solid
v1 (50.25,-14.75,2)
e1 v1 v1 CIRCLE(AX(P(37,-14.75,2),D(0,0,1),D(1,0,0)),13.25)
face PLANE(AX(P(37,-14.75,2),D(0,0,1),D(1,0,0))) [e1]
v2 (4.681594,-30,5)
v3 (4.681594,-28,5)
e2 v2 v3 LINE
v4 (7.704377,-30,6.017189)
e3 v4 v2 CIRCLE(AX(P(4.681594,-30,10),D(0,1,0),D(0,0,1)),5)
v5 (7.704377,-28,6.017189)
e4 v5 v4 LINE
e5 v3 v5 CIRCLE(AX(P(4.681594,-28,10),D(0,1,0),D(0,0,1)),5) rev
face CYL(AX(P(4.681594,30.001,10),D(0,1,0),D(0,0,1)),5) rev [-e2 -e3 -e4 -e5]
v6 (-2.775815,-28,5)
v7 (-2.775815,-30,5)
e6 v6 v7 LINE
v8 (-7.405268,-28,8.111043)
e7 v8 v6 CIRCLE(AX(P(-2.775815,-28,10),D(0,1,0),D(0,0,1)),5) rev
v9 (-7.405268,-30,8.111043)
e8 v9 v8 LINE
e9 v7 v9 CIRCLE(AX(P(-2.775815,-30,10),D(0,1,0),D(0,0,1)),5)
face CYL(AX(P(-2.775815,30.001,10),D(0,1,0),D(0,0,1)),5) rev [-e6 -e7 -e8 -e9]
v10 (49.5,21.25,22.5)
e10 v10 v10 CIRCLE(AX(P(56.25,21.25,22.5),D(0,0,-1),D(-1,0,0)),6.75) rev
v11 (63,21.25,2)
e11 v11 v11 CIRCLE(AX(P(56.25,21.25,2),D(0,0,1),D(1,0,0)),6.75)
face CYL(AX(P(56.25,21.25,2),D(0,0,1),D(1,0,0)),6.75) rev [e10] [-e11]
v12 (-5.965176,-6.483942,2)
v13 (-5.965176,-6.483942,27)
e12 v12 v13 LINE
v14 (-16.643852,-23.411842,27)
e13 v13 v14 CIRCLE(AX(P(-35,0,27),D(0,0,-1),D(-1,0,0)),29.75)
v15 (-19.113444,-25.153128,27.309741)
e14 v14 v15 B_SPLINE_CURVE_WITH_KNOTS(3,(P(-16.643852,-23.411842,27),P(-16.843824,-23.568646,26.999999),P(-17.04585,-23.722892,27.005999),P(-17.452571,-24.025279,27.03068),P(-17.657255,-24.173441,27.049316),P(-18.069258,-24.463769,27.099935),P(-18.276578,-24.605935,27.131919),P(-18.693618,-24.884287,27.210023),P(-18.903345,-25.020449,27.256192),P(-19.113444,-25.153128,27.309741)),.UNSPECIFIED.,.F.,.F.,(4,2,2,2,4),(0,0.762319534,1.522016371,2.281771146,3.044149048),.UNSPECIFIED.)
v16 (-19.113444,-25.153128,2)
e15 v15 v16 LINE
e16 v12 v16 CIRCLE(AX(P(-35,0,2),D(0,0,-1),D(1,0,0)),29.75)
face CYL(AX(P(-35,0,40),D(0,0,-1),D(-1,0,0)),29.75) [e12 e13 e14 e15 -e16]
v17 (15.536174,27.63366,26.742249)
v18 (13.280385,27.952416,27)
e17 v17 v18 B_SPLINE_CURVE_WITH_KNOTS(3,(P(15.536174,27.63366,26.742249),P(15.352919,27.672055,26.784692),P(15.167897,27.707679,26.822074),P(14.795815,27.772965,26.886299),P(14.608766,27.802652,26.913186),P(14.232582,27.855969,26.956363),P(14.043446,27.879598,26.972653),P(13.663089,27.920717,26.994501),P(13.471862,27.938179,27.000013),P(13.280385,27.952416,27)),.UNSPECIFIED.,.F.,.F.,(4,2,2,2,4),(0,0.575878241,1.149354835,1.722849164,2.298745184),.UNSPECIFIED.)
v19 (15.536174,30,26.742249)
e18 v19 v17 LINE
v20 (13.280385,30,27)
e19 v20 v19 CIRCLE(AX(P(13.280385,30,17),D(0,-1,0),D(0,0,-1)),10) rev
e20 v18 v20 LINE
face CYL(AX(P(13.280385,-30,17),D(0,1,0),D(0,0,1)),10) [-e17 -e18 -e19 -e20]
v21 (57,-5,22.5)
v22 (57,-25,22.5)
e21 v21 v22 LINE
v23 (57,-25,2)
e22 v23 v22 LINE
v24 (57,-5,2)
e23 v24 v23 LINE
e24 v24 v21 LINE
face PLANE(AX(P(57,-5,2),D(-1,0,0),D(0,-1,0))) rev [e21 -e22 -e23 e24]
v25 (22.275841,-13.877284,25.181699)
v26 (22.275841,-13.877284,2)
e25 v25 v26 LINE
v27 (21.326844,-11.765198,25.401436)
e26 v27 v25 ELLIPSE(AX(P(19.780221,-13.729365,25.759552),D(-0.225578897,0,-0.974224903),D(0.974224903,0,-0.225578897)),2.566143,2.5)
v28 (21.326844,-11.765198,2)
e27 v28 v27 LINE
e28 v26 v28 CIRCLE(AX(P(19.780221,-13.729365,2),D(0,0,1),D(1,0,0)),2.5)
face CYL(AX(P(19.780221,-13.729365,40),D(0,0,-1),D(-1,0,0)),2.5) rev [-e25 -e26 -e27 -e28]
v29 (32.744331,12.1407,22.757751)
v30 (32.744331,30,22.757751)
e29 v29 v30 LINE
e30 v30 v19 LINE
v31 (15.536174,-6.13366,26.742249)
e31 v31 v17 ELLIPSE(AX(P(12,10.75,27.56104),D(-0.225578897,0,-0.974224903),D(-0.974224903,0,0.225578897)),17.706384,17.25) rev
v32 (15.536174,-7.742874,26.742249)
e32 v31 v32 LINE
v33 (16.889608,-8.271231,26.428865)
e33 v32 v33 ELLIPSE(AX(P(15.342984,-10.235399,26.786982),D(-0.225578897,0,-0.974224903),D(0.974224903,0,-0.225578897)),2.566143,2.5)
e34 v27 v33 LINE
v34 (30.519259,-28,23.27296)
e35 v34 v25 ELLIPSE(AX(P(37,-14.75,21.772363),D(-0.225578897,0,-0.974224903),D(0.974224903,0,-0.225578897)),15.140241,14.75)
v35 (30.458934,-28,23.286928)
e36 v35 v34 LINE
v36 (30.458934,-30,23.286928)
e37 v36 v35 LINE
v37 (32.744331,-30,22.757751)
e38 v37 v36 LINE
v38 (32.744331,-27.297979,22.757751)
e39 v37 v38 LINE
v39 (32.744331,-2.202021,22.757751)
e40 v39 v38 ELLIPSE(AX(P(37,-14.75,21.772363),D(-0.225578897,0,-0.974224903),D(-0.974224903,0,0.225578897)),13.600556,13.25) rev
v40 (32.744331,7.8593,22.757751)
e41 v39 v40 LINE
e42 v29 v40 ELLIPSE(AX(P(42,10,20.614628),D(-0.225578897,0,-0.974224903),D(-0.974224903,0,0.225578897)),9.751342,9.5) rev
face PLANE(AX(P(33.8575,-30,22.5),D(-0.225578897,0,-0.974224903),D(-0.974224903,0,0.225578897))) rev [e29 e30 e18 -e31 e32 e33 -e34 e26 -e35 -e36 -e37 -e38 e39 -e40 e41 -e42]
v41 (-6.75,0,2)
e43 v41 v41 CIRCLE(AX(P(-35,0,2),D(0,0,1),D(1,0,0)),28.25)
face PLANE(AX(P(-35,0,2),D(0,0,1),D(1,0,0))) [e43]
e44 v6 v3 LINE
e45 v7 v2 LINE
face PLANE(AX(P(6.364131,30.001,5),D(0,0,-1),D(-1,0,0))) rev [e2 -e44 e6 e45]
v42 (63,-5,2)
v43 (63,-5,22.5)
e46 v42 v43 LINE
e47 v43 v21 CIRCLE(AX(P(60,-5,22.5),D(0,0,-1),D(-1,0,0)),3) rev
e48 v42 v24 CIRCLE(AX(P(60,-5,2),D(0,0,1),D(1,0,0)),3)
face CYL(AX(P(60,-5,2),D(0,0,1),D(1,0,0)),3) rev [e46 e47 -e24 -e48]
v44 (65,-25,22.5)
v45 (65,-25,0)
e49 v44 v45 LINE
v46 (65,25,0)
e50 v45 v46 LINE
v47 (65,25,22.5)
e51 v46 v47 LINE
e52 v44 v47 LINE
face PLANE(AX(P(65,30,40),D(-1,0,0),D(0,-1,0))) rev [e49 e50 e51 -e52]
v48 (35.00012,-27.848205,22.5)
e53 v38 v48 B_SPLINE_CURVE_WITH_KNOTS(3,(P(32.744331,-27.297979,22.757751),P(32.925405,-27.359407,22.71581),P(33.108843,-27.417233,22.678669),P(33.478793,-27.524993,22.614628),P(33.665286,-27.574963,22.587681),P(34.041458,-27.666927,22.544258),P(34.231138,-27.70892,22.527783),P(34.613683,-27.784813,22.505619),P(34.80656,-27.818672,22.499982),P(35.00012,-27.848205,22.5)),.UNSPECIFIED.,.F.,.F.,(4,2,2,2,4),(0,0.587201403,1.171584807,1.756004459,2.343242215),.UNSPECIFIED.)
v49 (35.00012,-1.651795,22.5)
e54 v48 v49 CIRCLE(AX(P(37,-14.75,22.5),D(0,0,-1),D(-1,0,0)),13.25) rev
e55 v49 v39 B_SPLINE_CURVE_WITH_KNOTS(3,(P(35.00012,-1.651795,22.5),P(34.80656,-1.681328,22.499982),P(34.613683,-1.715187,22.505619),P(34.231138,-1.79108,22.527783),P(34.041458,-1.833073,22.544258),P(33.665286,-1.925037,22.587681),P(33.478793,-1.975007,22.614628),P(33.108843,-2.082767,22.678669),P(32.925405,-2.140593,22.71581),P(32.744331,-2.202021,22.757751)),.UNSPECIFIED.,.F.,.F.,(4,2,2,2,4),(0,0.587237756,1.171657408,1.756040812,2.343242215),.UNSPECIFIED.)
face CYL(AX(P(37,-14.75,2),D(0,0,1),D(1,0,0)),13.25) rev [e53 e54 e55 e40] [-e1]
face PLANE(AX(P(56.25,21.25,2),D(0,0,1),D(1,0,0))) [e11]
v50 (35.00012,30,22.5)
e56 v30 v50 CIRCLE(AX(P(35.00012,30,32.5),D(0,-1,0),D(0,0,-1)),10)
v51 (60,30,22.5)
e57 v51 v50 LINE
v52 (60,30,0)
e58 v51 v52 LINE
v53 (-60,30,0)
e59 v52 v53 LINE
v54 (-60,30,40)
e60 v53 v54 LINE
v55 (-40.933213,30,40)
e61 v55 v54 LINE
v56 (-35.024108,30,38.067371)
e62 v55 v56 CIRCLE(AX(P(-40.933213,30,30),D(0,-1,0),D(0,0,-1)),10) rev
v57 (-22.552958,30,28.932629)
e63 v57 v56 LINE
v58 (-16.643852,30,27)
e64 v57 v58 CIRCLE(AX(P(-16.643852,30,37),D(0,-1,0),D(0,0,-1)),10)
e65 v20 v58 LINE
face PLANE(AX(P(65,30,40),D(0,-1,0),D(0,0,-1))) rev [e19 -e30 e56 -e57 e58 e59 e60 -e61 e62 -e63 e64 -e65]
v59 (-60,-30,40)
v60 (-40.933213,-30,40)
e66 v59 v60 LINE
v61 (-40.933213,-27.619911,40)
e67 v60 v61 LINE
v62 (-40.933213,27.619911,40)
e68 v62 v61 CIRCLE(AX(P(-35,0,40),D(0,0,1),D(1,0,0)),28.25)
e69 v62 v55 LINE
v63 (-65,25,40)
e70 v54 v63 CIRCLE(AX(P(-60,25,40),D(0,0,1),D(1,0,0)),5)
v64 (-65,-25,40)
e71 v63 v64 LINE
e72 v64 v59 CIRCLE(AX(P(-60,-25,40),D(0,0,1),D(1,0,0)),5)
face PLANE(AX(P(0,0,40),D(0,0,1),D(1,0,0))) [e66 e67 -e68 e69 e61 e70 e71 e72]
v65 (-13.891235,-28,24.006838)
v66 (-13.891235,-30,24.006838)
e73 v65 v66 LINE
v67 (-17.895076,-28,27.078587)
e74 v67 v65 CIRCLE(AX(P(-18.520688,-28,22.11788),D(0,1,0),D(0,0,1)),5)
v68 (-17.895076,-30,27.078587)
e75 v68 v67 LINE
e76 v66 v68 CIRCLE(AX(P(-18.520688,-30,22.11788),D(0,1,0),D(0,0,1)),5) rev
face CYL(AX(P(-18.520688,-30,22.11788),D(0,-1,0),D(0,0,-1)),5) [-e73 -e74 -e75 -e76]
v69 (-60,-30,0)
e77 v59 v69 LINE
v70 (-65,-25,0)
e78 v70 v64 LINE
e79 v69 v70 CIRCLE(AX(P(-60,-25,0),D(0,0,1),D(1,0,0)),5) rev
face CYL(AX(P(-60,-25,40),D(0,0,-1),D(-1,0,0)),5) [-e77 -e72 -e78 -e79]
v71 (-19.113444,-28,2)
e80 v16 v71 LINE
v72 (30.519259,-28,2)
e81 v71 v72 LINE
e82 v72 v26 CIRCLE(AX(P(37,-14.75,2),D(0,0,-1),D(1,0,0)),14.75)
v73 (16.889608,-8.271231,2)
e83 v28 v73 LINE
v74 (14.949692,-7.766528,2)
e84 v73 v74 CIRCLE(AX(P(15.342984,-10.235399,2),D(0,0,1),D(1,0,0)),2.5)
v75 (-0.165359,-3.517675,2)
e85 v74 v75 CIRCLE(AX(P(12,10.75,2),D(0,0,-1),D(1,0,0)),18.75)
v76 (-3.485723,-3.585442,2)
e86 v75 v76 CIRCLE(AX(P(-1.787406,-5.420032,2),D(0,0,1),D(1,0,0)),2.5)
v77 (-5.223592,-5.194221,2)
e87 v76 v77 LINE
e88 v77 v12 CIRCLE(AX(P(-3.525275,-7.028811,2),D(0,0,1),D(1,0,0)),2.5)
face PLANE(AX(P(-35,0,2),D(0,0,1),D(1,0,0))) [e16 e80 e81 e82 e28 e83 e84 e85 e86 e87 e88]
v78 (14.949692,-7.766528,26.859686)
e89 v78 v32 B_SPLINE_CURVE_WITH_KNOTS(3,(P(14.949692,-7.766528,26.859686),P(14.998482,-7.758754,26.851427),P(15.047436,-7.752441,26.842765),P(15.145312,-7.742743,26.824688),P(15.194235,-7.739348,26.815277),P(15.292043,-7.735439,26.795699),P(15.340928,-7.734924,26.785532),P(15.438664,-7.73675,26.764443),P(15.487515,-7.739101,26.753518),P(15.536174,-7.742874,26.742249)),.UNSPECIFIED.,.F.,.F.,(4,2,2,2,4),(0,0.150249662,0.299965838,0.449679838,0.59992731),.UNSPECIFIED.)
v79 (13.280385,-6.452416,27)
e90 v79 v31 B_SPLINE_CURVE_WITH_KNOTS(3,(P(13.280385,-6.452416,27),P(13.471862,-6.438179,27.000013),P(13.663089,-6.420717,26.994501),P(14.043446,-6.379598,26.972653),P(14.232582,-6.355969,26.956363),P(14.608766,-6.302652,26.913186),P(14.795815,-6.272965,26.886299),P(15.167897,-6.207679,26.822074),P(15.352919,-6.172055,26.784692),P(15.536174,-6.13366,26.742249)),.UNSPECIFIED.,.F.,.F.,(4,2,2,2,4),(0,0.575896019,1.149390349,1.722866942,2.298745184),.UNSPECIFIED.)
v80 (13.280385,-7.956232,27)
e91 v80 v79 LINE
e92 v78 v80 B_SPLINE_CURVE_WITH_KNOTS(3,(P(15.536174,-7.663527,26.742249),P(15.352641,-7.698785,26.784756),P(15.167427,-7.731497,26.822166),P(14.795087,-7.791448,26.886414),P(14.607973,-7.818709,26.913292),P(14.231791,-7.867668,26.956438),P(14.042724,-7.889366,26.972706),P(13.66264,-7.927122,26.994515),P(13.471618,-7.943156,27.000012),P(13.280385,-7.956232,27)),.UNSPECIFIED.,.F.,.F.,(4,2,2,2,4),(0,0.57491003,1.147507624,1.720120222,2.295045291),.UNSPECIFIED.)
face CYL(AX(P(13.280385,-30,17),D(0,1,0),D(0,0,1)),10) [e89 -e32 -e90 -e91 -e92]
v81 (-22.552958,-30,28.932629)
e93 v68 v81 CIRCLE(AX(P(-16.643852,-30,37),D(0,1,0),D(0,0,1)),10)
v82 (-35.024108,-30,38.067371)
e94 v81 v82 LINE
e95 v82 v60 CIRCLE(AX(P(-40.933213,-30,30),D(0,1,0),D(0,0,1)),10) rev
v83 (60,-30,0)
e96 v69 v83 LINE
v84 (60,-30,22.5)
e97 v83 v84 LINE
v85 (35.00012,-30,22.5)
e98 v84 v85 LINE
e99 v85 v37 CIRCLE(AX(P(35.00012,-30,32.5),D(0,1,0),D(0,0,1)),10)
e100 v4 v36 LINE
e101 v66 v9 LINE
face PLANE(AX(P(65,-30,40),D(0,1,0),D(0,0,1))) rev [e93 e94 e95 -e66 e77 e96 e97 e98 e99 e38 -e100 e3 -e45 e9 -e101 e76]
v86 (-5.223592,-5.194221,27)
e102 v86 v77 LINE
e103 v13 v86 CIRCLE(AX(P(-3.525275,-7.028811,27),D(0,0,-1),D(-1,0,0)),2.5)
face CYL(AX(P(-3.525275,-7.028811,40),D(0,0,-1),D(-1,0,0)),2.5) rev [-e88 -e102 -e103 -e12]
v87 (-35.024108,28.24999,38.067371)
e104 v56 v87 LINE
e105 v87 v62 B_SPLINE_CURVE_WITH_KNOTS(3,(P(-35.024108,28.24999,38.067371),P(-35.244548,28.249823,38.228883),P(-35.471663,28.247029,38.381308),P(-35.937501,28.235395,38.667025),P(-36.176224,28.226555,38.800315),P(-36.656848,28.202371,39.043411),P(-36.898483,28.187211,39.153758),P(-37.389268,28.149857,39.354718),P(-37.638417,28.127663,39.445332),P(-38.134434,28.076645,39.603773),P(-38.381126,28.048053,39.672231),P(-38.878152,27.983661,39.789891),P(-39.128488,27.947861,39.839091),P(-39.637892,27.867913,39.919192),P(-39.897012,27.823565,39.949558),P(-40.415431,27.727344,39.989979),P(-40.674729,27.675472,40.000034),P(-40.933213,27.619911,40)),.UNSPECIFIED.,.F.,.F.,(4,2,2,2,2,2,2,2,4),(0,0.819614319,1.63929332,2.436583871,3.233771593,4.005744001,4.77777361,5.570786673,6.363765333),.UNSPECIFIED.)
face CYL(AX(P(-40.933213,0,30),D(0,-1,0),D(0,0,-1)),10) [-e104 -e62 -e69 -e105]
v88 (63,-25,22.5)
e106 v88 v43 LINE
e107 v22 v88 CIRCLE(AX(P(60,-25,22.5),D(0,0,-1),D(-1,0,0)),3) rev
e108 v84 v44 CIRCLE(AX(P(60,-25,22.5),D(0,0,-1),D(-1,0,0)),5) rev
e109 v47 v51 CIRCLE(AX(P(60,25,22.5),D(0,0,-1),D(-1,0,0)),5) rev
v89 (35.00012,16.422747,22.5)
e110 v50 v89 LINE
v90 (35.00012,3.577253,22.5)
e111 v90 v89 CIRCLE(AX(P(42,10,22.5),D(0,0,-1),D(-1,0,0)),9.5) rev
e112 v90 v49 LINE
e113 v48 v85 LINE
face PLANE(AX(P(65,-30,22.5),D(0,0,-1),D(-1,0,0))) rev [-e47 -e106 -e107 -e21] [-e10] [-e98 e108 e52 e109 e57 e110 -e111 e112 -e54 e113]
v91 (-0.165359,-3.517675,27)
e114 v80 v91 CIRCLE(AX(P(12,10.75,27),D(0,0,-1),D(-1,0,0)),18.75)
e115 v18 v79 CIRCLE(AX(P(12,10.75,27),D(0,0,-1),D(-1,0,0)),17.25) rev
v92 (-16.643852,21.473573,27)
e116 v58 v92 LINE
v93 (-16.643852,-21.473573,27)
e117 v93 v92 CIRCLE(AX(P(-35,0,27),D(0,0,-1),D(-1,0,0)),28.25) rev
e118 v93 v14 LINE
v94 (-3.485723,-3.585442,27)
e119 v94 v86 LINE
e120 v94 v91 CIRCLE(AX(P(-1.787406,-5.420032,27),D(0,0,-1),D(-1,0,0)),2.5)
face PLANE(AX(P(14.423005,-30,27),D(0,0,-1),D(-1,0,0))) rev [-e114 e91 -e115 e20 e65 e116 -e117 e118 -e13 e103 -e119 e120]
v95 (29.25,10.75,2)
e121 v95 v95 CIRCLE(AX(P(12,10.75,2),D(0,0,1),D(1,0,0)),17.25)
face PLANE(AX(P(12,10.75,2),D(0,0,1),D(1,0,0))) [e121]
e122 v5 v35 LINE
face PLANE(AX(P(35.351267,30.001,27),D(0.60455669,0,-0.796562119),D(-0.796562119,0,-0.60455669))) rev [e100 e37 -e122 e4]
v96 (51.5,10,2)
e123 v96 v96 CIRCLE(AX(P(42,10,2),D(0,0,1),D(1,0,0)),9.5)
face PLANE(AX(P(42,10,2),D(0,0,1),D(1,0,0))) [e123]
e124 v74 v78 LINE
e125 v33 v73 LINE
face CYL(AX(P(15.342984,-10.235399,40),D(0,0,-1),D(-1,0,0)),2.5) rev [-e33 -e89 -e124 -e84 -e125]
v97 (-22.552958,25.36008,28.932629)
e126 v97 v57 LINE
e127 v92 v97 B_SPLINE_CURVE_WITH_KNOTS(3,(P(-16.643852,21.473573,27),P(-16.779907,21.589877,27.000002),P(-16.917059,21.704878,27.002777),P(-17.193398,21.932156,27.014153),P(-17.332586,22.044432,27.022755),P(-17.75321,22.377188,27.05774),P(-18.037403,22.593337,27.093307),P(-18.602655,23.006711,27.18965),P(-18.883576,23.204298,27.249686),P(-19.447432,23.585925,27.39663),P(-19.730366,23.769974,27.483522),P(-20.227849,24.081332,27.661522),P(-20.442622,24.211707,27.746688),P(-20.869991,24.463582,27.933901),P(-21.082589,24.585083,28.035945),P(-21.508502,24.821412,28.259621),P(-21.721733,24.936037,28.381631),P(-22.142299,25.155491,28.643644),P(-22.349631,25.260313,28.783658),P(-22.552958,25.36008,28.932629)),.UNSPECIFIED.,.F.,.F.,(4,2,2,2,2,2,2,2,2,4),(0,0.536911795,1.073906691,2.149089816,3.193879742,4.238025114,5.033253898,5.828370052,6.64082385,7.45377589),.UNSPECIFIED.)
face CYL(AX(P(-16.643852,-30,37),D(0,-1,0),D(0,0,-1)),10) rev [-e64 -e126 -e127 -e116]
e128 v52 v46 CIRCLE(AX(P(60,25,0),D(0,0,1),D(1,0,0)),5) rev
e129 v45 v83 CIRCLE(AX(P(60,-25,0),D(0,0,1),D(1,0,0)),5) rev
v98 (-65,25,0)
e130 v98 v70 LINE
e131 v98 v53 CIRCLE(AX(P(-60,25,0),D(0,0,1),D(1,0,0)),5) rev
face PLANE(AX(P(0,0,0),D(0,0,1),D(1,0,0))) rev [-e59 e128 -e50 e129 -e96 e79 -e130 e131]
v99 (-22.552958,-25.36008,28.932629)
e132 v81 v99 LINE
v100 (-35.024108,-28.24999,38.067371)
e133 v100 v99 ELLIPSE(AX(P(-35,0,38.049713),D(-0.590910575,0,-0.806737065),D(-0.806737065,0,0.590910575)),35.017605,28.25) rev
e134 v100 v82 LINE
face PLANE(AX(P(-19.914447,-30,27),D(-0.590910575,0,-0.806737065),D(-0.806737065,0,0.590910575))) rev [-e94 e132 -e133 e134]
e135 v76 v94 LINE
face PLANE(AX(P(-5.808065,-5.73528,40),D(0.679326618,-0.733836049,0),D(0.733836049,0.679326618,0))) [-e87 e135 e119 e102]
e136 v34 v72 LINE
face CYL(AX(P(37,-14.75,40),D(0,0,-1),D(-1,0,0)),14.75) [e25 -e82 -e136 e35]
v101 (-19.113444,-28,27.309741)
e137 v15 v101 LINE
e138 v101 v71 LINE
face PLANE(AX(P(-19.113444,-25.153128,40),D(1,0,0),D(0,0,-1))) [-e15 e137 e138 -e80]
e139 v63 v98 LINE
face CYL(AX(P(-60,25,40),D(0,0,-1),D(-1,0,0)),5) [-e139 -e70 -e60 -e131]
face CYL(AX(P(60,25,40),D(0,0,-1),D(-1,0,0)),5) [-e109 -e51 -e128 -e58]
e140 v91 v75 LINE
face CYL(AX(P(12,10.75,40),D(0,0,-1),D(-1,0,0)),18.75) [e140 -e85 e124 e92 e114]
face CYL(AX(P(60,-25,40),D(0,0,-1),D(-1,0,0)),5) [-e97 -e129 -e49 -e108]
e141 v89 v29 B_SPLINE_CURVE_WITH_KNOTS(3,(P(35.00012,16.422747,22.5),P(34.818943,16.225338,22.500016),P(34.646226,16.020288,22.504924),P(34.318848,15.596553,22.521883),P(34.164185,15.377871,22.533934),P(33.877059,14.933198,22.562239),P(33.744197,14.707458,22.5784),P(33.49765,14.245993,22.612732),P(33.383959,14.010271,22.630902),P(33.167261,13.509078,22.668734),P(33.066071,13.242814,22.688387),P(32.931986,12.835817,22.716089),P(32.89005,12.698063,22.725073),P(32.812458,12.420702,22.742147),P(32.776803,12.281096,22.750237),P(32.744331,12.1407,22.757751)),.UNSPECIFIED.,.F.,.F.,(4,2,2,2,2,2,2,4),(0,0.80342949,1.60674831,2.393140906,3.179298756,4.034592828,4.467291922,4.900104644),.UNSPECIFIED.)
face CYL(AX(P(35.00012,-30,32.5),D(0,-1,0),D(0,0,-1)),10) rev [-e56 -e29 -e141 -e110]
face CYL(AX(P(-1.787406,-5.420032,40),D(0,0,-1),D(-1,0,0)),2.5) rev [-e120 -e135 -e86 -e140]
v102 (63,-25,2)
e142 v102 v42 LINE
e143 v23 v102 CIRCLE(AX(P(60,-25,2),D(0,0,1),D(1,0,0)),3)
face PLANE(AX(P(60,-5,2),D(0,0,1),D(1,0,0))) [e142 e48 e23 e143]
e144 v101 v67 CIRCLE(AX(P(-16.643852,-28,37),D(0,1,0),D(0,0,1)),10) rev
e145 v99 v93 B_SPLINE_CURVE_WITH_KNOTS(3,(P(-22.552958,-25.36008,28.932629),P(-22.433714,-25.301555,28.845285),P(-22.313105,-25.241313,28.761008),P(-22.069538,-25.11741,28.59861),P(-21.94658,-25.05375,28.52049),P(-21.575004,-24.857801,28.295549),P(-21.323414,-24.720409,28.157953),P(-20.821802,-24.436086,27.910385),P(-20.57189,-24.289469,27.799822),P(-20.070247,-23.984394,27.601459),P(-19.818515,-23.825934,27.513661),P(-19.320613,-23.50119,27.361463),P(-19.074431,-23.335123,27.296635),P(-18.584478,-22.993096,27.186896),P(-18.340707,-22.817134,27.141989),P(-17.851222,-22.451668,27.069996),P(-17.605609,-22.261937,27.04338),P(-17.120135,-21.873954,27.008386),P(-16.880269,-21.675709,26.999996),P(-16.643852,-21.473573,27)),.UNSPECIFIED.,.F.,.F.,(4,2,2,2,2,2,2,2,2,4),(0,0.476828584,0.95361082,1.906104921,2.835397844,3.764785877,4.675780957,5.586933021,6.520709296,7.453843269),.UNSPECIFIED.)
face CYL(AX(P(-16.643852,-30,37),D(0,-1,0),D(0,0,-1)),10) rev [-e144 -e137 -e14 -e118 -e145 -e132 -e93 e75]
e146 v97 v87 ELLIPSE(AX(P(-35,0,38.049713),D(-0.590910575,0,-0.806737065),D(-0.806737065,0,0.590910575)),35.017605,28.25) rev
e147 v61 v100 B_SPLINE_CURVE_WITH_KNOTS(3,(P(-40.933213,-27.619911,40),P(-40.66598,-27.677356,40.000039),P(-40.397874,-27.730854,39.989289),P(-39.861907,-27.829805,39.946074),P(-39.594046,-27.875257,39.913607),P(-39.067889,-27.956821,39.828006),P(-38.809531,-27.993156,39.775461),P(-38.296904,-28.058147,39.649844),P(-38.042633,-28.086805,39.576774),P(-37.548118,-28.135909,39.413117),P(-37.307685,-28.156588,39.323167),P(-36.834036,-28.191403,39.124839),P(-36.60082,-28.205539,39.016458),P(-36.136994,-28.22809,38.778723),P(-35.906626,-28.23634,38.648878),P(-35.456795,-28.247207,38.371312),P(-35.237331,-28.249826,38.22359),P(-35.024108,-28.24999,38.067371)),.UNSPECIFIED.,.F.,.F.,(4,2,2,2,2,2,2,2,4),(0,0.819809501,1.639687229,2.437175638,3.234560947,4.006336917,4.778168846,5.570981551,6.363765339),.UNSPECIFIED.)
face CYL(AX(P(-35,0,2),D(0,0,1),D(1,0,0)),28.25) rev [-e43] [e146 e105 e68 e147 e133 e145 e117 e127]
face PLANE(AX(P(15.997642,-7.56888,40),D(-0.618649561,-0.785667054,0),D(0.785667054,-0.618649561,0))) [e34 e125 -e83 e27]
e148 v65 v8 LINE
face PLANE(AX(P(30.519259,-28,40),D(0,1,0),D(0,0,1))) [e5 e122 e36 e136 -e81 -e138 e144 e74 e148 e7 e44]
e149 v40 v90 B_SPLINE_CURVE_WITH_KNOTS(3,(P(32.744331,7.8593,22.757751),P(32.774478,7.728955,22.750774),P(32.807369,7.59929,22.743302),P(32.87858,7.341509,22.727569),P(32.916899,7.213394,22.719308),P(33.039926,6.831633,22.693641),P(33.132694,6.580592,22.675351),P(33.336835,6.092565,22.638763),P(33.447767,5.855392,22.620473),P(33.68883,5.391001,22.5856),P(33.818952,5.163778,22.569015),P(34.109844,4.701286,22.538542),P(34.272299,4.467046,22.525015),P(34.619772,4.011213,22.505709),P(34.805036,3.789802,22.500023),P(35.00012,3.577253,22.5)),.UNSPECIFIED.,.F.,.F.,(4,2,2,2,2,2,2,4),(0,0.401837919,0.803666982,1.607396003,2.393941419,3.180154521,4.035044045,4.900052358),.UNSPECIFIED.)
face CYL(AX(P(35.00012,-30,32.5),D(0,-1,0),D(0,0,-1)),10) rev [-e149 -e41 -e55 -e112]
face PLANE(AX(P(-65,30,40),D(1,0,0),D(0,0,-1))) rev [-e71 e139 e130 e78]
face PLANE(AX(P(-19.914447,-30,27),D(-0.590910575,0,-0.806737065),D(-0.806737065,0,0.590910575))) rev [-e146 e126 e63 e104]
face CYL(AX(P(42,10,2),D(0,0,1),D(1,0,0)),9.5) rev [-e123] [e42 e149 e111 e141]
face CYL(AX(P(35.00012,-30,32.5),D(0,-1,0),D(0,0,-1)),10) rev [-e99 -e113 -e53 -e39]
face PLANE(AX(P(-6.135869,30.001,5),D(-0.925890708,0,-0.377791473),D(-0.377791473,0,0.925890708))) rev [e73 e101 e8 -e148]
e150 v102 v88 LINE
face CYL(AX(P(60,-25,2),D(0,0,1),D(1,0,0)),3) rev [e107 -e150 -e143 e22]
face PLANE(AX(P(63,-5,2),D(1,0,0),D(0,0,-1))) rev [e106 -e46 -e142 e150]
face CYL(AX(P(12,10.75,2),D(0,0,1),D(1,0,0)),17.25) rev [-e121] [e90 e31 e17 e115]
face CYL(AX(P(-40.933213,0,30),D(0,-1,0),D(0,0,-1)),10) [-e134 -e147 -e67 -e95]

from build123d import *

# Parameters (mm, degrees)
SKETCH1_W               = 60
SKETCH1_H               = 130
BOSS_EXTRUDE1_DEPTH     = 40
SKETCH2_R               = 28.25
SKETCH2_R_2             = 13.25
SKETCH2_R_3             = 17.25
SKETCH2_R_4             = 6.75
SKETCH2_R_5             = 9.5
CUT_EXTRUDE1_DEPTH      = 38
CUT_EXTRUDE9_DEPTH      = 83.006097334
CUT_EXTRUDE9_DEPTH_BACK = 83.006097334
CUT_EXTRUDE10_START     = 2
CUT_EXTRUDE10_DEPTH     = 81.006097334
CUT_EXTRUDE11_REACH     = 99.082
FILLET8_R               = 5
FILLET9_R               = 10
FILLET10_R              = 2.5
FILLET11_R              = 5


with BuildPart() as part:
    # Sketch1 → Boss-Extrude1 (new body)
    with BuildSketch(Plane(origin=(0, 0, 0), x_dir=(0, 1, 0), z_dir=(0, 0, 1))):
        Rectangle(SKETCH1_W, SKETCH1_H)
    extrude(amount=BOSS_EXTRUDE1_DEPTH)

    # Sketch2 → Cut-Extrude1 (cut)
    with BuildSketch(Plane.XY.offset(40)):
        with Locations((-35, 0)):
            Circle(SKETCH2_R)
        with Locations((37, -14.75)):
            Circle(SKETCH2_R_2)
        with Locations((12, 10.75)):
            Circle(SKETCH2_R_3)
        with Locations((56.25, 21.25)):
            Circle(SKETCH2_R_4)
        with Locations((42, 10)):
            Circle(SKETCH2_R_5)
        with BuildLine():
            Line((63, -5), (63, -25))
            ThreePointArc((63, -25), (60, -28), (57, -25))
            Line((57, -25), (57, -5))
            ThreePointArc((57, -5), (60, -2), (63, -5))
        make_face()
    extrude(amount=-CUT_EXTRUDE1_DEPTH, mode=Mode.SUBTRACT)

    # Sketch11 → Cut-Extrude9 (cut, two sides: drawn at the far end of the back side and taken through both)
    with BuildSketch(Plane(origin=(0, 0, 0), x_dir=(-1, 0, 0), z_dir=(0, 1, 0)).offset(-CUT_EXTRUDE9_DEPTH_BACK)):
        Polygon((37.662617959, 40), (-65, 40), (-65, 22.5), (-33.857500095, 22.5), (-14.42300462, 27), (19.914447088, 27), align=None)
    extrude(amount=CUT_EXTRUDE9_DEPTH + CUT_EXTRUDE9_DEPTH_BACK, mode=Mode.SUBTRACT)

    # Sketch12 → Cut-Extrude10 (cut, through all)
    with BuildSketch(Plane(origin=(0, 0, 0), x_dir=(0, 1, 0), z_dir=(0, 0, 1)).offset(CUT_EXTRUDE10_START)):
        with BuildLine():
            Line((-25.153127982, 19.113444278), (-28, 19.113444278))
            Line((-28, 19.113444278), (-28, -14.42300462))
            Line((-28, -14.42300462), (-28, -30.519259302))
            ThreePointArc((-28, -30.519259302), (-21.630520462, -23.953125349), (-12.614481333, -22.405409906))
            Line((-12.614481333, -22.405409906), (-7.568879853, -15.997641924))
            ThreePointArc((-7.568879853, -15.997641924), (-7.137176738, -6.377597635), (-1.98737408, 1.759425917))
            Line((-1.98737408, 1.759425917), (-5.735279815, 5.808065062))
            ThreePointArc((-5.735279815, 5.808065062), (-16.816114685, 10.458590364), (-25.153127982, 19.113444278))
        make_face()
    extrude(amount=CUT_EXTRUDE10_DEPTH, mode=Mode.SUBTRACT)

    # Sketch13 → Cut-Extrude11 (cut, up to next)
    with BuildSketch(Plane.XZ.offset(30), mode=Mode.PRIVATE) as cut_extrude11_sk1:
        Polygon((-15.112535459, 27), (35.351266766, 27), (6.364131369, 5), (-6.135868631, 5), align=None)
    cut_extrude11_tool1 = extrude(cut_extrude11_sk1.sketch, amount=-CUT_EXTRUDE11_REACH, mode=Mode.PRIVATE) & part.part
    add(cut_extrude11_tool1.solids().sort_by_distance((6.122185, -30, 18.210804))[0], mode=Mode.SUBTRACT)

    # Fillet8
    fillet8_edges = [part.edges().sort_by_distance(p)[0] for p in [
        (65, 30, 11.25),
        (65, -30, 11.25),
        (-65, -30, 20),
        (-65, 30, 20),
    ]]
    fillet(fillet8_edges, radius=FILLET8_R)

    # Fillet9
    # the kernel refuses this fillet: 10 mm, written as the material it adds along each edge
    with BuildSketch(Plane(origin=(33.857500095, -30, 22.5), x_dir=(1, 0, 0), z_dir=(0, 1, 0))) as fillet9_piece_1_section:
        with BuildLine():
            CenterArc((FILLET9_R * 0.114262005899, -FILLET9_R), FILLET9_R, 90, 13.036921742)
            Line((-FILLET9_R * 0.111316891577, -FILLET9_R * 0.0257750973141), (0, 0))
            Line((0, 0), (FILLET9_R * 0.114262005899, 0))
        make_face()
    fillet9_piece_1 = extrude(amount=5.234596359, mode=Mode.PRIVATE)
    fillet9_piece_1 = fillet9_piece_1 - Plane(origin=(37, -14.75, 22.477974756), x_dir=(1, 0, 0), z_dir=(0, 0, 1)) * Cylinder(13.25, 16, mode=Mode.PRIVATE)
    add(fillet9_piece_1)
    with BuildSketch(Plane(origin=(33.857500095, -4.734596359, 22.5), x_dir=(1, 0, 0), z_dir=(0, 1, 0))) as fillet9_piece_2_section:
        with BuildLine():
            CenterArc((FILLET9_R * 0.114262005899, -FILLET9_R), FILLET9_R, 90, 13.036921742)
            Line((-FILLET9_R * 0.111316891577, -FILLET9_R * 0.0257750973141), (0, 0))
            Line((0, 0), (FILLET9_R * 0.114262005899, 0))
        make_face()
    fillet9_piece_2 = extrude(amount=12.697303917, mode=Mode.PRIVATE)
    fillet9_piece_2 = fillet9_piece_2 - Plane(origin=(37, -14.75, 22.48681781), x_dir=(1, 0, 0), z_dir=(0, 0, 1)) * Cylinder(13.25, 30, mode=Mode.PRIVATE)
    fillet9_piece_2 = fillet9_piece_2 - Plane(origin=(42, 10, 22.48681781), x_dir=(1, 0, 0), z_dir=(0, 0, 1)) * Cylinder(9.5, 30, mode=Mode.PRIVATE)
    add(fillet9_piece_2)
    with BuildSketch(Plane(origin=(33.857500095, 12.037292442, 22.5), x_dir=(1, 0, 0), z_dir=(0, 1, 0))) as fillet9_piece_3_section:
        with BuildLine():
            CenterArc((FILLET9_R * 0.114262005899, -FILLET9_R), FILLET9_R, 90, 13.036921742)
            Line((-FILLET9_R * 0.111316891577, -FILLET9_R * 0.0257750973141), (0, 0))
            Line((0, 0), (FILLET9_R * 0.114262005899, 0))
        make_face()
    fillet9_piece_3 = extrude(amount=17.962707558, mode=Mode.PRIVATE)
    fillet9_piece_3 = fillet9_piece_3 - Plane(origin=(42, 10, 22.478816229), x_dir=(1, 0, 0), z_dir=(0, 0, 1)) * Cylinder(9.5, 41, mode=Mode.PRIVATE)
    add(fillet9_piece_3)
    with BuildSketch(Plane(origin=(-19.914447088, -15.708414802, 27), x_dir=(1, 0, 0), z_dir=(0, -1, 0))) as fillet9_piece_4_section:
        with BuildLine():
            CenterArc((FILLET9_R * 0.327059529607, FILLET9_R), FILLET9_R, 233.778347997, 36.221652003)
            Line((-FILLET9_R * 0.263851045123, FILLET9_R * 0.193262934611), (0, 0))
            Line((0, 0), (FILLET9_R * 0.327059529607, 0))
        make_face()
    fillet9_piece_4 = extrude(amount=14.291585198, mode=Mode.PRIVATE)
    fillet9_piece_4 = fillet9_piece_4 & Plane(origin=(-35, 0, 26.964300655), x_dir=(0.9812415105326922, -0.19278251478679478, 0), z_dir=(0, 0, -1)) * Cylinder(29.75, 42, mode=Mode.PRIVATE)
    fillet9_piece_4 = split(fillet9_piece_4, bisect_by=Plane(origin=(-19.113444278, -23.524724426, 26.964300655), z_dir=(1, 0, 0)), keep=Keep.TOP, mode=Mode.PRIVATE)
    fillet9_piece_4 = fillet9_piece_4 - Plane(origin=(-35, 0, 26.964300655), x_dir=(1, 0, 0), z_dir=(0, 0, 1)) * Cylinder(28.25, 42, mode=Mode.PRIVATE)
    add(fillet9_piece_4)
    with BuildSketch(Plane(origin=(-19.914447088, -15.708414802, 27), x_dir=(1, 0, 0), z_dir=(0, -1, 0))) as fillet9_piece_5_section:
        with BuildLine():
            CenterArc((FILLET9_R * 0.327059529607, FILLET9_R), FILLET9_R, 233.778347997, 36.221652003)
            Line((-FILLET9_R * 0.263851045123, FILLET9_R * 0.193262934611), (0, 0))
            Line((0, 0), (FILLET9_R * 0.327059529607, 0))
        make_face()
    fillet9_piece_5 = extrude(amount=14.291585198, mode=Mode.PRIVATE)
    fillet9_piece_5 = fillet9_piece_5 & Plane(origin=(-35, 0, 27.570308722), x_dir=(0.9812415105326922, -0.19278251478679478, 0), z_dir=(0, 0, -1)) * Cylinder(29.75, 42, mode=Mode.PRIVATE)
    fillet9_piece_5 = split(fillet9_piece_5, bisect_by=Plane(origin=(-19.113444278, -25.104682391, 27.570308722), z_dir=(-1, 0, 0)), keep=Keep.TOP, mode=Mode.PRIVATE)
    fillet9_piece_5 = fillet9_piece_5 - Plane(origin=(-35, 0, 27.570308722), x_dir=(1, 0, 0), z_dir=(0, 0, 1)) * Cylinder(28.25, 42, mode=Mode.PRIVATE)
    add(fillet9_piece_5)
    with BuildSketch(Plane(origin=(-19.914447088, -15.708414802, 27), x_dir=(1, 0, 0), z_dir=(0, -1, 0))) as fillet9_piece_6_section:
        with BuildLine():
            CenterArc((FILLET9_R * 0.327059529607, FILLET9_R), FILLET9_R, 233.778347997, 36.221652003)
            Line((-FILLET9_R * 0.263851045123, FILLET9_R * 0.193262934611), (0, 0))
            Line((0, 0), (FILLET9_R * 0.327059529607, 0))
        make_face()
    fillet9_piece_6 = extrude(amount=14.291585198, mode=Mode.PRIVATE)
    fillet9_piece_6 = fillet9_piece_6 - Plane(origin=(-35, 0, 27.459351012), x_dir=(0.9812415105326922, -0.19278251478679478, 0), z_dir=(0, 0, -1)) * Cylinder(29.75, 42, mode=Mode.PRIVATE)
    fillet9_piece_6 = split(fillet9_piece_6, bisect_by=Plane(origin=(-19.113444278, -26.928061773, 27.459351012), z_dir=(-1, 0, 0)), keep=Keep.TOP, mode=Mode.PRIVATE)
    fillet9_piece_6 = split(fillet9_piece_6, bisect_by=Plane(origin=(-20.316684316, -28, 27.459351012), z_dir=(0, 1, 0)), keep=Keep.TOP, mode=Mode.PRIVATE)
    add(fillet9_piece_6)
    with BuildSketch(Plane(origin=(-19.914447088, -15.708414802, 27), x_dir=(1, 0, 0), z_dir=(0, -1, 0))) as fillet9_piece_7_section:
        with BuildLine():
            CenterArc((FILLET9_R * 0.327059529607, FILLET9_R), FILLET9_R, 233.778347997, 36.221652003)
            Line((-FILLET9_R * 0.263851045123, FILLET9_R * 0.193262934611), (0, 0))
            Line((0, 0), (FILLET9_R * 0.327059529607, 0))
        make_face()
    fillet9_piece_7 = extrude(amount=14.291585198, mode=Mode.PRIVATE)
    fillet9_piece_7 = split(fillet9_piece_7, bisect_by=Plane(origin=(-19.113444278, -29, 26.965326642), z_dir=(1, 0, 0)), keep=Keep.TOP, mode=Mode.PRIVATE)
    fillet9_piece_7 = split(fillet9_piece_7, bisect_by=Plane(origin=(-18.088636338, -28, 26.965326642), z_dir=(0, -1, 0)), keep=Keep.TOP, mode=Mode.PRIVATE)
    add(fillet9_piece_7)
    with BuildSketch(Plane(origin=(-19.914447088, -15.708414802, 27), x_dir=(1, 0, 0), z_dir=(0, -1, 0))) as fillet9_piece_8_section:
        with BuildLine():
            CenterArc((FILLET9_R * 0.327059529607, FILLET9_R), FILLET9_R, 233.778347997, 36.221652003)
            Line((-FILLET9_R * 0.263851045123, FILLET9_R * 0.193262934611), (0, 0))
            Line((0, 0), (FILLET9_R * 0.327059529607, 0))
        make_face()
    fillet9_piece_8 = extrude(amount=14.291585198, mode=Mode.PRIVATE)
    fillet9_piece_8 = split(fillet9_piece_8, bisect_by=Plane(origin=(-19.113444278, -29, 27.580257853), z_dir=(-1, 0, 0)), keep=Keep.TOP, mode=Mode.PRIVATE)
    fillet9_piece_8 = split(fillet9_piece_8, bisect_by=Plane(origin=(-20.54645477, -28, 27.580257853), z_dir=(0, -1, 0)), keep=Keep.TOP, mode=Mode.PRIVATE)
    add(fillet9_piece_8)
    with BuildSketch(Plane(origin=(-19.914447088, 30, 27), x_dir=(-0.8067370653888534, 0, 0.5909105747300355), z_dir=(0, -1, 0))) as fillet9_piece_9_section:
        with BuildLine():
            CenterArc((FILLET9_R * 0.327059529607, -FILLET9_R), FILLET9_R, 90, 36.221652003)
            Line((-FILLET9_R * 0.263851045123, -FILLET9_R * 0.193262934611), (0, 0))
            Line((0, 0), (FILLET9_R * 0.327059529607, 0))
        make_face()
    fillet9_piece_9 = extrude(amount=14.291585198, mode=Mode.PRIVATE)
    fillet9_piece_9 = fillet9_piece_9 - Plane(origin=(-35, 0, 27.325753935), x_dir=(1, 0, 0), z_dir=(0, 0, 1)) * Cylinder(28.25, 42, mode=Mode.PRIVATE)
    add(fillet9_piece_9)
    # the kernel refuses this fillet: 10 mm, written as the material it takes off along each edge
    with BuildSketch(Plane(origin=(14.42300462, 32.856550147, 27), x_dir=(0.9742249026859169, 0, -0.22557889747628432), z_dir=(0, -1, 0))) as fillet9_2_piece_1:
        with BuildLine():
            CenterArc((FILLET9_R * 0.114262005899, -FILLET9_R), FILLET9_R, 90, 13.036921742)
            Line((-FILLET9_R * 0.111316891577, -FILLET9_R * 0.0257750973141), (0, 0))
            Line((0, 0), (FILLET9_R * 0.114262005899, 0))
        make_face()
    extrude(amount=7.884120565, mode=Mode.SUBTRACT)
    with BuildSketch(Plane(origin=(14.42300462, -3.472429582, 27), x_dir=(0.9742249026859169, 0, -0.22557889747628432), z_dir=(0, -1, 0))) as fillet9_2_piece_2:
        with BuildLine():
            CenterArc((FILLET9_R * 0.114262005899, -FILLET9_R), FILLET9_R, 90, 13.036921742)
            Line((-FILLET9_R * 0.111316891577, -FILLET9_R * 0.0257750973141), (0, 0))
            Line((0, 0), (FILLET9_R * 0.114262005899, 0))
        make_face()
    extrude(amount=7.226902729, mode=Mode.SUBTRACT)
    with BuildSketch(Plane(origin=(-37.662617959, 38.17648824, 40), x_dir=(0.8067370653888553, 0, -0.5909105747300331), z_dir=(0, -1, 0)), Plane(origin=(-37.662617959, -19.94775336, 40), x_dir=(0.8067370653888553, 0, -0.5909105747300331), z_dir=(0, -1, 0))) as fillet9_2_piece_3:
        with BuildLine():
            CenterArc((FILLET9_R * 0.327059529607, -FILLET9_R), FILLET9_R, 90, 36.221652003)
            Line((-FILLET9_R * 0.263851045123, -FILLET9_R * 0.193262934611), (0, 0))
            Line((0, 0), (FILLET9_R * 0.327059529607, 0))
        make_face()
    extrude(amount=18.22873488, mode=Mode.SUBTRACT)

    # Fillet10
    fillet10_edges = [part.edges().sort_by_distance(p)[0] for p in [
        (22.405409906, -12.614481333, 13.575848822),
        (15.997641924, -7.568879853, 14.317698693),
        (-1.759425917, -1.98737408, 14.5),
        (-5.808065062, -5.735279815, 14.5),
    ]]
    fillet(fillet10_edges, radius=FILLET10_R)

    # Fillet11
    fillet11_edges = [part.edges().sort_by_distance(p)[0] for p in [
        (6.364131369, -29, 5),
        (-6.135868631, -29, 5),
        (-15.112535459, -29, 27),
    ]]
    fillet(fillet11_edges, radius=FILLET11_R)


solid = part.part
